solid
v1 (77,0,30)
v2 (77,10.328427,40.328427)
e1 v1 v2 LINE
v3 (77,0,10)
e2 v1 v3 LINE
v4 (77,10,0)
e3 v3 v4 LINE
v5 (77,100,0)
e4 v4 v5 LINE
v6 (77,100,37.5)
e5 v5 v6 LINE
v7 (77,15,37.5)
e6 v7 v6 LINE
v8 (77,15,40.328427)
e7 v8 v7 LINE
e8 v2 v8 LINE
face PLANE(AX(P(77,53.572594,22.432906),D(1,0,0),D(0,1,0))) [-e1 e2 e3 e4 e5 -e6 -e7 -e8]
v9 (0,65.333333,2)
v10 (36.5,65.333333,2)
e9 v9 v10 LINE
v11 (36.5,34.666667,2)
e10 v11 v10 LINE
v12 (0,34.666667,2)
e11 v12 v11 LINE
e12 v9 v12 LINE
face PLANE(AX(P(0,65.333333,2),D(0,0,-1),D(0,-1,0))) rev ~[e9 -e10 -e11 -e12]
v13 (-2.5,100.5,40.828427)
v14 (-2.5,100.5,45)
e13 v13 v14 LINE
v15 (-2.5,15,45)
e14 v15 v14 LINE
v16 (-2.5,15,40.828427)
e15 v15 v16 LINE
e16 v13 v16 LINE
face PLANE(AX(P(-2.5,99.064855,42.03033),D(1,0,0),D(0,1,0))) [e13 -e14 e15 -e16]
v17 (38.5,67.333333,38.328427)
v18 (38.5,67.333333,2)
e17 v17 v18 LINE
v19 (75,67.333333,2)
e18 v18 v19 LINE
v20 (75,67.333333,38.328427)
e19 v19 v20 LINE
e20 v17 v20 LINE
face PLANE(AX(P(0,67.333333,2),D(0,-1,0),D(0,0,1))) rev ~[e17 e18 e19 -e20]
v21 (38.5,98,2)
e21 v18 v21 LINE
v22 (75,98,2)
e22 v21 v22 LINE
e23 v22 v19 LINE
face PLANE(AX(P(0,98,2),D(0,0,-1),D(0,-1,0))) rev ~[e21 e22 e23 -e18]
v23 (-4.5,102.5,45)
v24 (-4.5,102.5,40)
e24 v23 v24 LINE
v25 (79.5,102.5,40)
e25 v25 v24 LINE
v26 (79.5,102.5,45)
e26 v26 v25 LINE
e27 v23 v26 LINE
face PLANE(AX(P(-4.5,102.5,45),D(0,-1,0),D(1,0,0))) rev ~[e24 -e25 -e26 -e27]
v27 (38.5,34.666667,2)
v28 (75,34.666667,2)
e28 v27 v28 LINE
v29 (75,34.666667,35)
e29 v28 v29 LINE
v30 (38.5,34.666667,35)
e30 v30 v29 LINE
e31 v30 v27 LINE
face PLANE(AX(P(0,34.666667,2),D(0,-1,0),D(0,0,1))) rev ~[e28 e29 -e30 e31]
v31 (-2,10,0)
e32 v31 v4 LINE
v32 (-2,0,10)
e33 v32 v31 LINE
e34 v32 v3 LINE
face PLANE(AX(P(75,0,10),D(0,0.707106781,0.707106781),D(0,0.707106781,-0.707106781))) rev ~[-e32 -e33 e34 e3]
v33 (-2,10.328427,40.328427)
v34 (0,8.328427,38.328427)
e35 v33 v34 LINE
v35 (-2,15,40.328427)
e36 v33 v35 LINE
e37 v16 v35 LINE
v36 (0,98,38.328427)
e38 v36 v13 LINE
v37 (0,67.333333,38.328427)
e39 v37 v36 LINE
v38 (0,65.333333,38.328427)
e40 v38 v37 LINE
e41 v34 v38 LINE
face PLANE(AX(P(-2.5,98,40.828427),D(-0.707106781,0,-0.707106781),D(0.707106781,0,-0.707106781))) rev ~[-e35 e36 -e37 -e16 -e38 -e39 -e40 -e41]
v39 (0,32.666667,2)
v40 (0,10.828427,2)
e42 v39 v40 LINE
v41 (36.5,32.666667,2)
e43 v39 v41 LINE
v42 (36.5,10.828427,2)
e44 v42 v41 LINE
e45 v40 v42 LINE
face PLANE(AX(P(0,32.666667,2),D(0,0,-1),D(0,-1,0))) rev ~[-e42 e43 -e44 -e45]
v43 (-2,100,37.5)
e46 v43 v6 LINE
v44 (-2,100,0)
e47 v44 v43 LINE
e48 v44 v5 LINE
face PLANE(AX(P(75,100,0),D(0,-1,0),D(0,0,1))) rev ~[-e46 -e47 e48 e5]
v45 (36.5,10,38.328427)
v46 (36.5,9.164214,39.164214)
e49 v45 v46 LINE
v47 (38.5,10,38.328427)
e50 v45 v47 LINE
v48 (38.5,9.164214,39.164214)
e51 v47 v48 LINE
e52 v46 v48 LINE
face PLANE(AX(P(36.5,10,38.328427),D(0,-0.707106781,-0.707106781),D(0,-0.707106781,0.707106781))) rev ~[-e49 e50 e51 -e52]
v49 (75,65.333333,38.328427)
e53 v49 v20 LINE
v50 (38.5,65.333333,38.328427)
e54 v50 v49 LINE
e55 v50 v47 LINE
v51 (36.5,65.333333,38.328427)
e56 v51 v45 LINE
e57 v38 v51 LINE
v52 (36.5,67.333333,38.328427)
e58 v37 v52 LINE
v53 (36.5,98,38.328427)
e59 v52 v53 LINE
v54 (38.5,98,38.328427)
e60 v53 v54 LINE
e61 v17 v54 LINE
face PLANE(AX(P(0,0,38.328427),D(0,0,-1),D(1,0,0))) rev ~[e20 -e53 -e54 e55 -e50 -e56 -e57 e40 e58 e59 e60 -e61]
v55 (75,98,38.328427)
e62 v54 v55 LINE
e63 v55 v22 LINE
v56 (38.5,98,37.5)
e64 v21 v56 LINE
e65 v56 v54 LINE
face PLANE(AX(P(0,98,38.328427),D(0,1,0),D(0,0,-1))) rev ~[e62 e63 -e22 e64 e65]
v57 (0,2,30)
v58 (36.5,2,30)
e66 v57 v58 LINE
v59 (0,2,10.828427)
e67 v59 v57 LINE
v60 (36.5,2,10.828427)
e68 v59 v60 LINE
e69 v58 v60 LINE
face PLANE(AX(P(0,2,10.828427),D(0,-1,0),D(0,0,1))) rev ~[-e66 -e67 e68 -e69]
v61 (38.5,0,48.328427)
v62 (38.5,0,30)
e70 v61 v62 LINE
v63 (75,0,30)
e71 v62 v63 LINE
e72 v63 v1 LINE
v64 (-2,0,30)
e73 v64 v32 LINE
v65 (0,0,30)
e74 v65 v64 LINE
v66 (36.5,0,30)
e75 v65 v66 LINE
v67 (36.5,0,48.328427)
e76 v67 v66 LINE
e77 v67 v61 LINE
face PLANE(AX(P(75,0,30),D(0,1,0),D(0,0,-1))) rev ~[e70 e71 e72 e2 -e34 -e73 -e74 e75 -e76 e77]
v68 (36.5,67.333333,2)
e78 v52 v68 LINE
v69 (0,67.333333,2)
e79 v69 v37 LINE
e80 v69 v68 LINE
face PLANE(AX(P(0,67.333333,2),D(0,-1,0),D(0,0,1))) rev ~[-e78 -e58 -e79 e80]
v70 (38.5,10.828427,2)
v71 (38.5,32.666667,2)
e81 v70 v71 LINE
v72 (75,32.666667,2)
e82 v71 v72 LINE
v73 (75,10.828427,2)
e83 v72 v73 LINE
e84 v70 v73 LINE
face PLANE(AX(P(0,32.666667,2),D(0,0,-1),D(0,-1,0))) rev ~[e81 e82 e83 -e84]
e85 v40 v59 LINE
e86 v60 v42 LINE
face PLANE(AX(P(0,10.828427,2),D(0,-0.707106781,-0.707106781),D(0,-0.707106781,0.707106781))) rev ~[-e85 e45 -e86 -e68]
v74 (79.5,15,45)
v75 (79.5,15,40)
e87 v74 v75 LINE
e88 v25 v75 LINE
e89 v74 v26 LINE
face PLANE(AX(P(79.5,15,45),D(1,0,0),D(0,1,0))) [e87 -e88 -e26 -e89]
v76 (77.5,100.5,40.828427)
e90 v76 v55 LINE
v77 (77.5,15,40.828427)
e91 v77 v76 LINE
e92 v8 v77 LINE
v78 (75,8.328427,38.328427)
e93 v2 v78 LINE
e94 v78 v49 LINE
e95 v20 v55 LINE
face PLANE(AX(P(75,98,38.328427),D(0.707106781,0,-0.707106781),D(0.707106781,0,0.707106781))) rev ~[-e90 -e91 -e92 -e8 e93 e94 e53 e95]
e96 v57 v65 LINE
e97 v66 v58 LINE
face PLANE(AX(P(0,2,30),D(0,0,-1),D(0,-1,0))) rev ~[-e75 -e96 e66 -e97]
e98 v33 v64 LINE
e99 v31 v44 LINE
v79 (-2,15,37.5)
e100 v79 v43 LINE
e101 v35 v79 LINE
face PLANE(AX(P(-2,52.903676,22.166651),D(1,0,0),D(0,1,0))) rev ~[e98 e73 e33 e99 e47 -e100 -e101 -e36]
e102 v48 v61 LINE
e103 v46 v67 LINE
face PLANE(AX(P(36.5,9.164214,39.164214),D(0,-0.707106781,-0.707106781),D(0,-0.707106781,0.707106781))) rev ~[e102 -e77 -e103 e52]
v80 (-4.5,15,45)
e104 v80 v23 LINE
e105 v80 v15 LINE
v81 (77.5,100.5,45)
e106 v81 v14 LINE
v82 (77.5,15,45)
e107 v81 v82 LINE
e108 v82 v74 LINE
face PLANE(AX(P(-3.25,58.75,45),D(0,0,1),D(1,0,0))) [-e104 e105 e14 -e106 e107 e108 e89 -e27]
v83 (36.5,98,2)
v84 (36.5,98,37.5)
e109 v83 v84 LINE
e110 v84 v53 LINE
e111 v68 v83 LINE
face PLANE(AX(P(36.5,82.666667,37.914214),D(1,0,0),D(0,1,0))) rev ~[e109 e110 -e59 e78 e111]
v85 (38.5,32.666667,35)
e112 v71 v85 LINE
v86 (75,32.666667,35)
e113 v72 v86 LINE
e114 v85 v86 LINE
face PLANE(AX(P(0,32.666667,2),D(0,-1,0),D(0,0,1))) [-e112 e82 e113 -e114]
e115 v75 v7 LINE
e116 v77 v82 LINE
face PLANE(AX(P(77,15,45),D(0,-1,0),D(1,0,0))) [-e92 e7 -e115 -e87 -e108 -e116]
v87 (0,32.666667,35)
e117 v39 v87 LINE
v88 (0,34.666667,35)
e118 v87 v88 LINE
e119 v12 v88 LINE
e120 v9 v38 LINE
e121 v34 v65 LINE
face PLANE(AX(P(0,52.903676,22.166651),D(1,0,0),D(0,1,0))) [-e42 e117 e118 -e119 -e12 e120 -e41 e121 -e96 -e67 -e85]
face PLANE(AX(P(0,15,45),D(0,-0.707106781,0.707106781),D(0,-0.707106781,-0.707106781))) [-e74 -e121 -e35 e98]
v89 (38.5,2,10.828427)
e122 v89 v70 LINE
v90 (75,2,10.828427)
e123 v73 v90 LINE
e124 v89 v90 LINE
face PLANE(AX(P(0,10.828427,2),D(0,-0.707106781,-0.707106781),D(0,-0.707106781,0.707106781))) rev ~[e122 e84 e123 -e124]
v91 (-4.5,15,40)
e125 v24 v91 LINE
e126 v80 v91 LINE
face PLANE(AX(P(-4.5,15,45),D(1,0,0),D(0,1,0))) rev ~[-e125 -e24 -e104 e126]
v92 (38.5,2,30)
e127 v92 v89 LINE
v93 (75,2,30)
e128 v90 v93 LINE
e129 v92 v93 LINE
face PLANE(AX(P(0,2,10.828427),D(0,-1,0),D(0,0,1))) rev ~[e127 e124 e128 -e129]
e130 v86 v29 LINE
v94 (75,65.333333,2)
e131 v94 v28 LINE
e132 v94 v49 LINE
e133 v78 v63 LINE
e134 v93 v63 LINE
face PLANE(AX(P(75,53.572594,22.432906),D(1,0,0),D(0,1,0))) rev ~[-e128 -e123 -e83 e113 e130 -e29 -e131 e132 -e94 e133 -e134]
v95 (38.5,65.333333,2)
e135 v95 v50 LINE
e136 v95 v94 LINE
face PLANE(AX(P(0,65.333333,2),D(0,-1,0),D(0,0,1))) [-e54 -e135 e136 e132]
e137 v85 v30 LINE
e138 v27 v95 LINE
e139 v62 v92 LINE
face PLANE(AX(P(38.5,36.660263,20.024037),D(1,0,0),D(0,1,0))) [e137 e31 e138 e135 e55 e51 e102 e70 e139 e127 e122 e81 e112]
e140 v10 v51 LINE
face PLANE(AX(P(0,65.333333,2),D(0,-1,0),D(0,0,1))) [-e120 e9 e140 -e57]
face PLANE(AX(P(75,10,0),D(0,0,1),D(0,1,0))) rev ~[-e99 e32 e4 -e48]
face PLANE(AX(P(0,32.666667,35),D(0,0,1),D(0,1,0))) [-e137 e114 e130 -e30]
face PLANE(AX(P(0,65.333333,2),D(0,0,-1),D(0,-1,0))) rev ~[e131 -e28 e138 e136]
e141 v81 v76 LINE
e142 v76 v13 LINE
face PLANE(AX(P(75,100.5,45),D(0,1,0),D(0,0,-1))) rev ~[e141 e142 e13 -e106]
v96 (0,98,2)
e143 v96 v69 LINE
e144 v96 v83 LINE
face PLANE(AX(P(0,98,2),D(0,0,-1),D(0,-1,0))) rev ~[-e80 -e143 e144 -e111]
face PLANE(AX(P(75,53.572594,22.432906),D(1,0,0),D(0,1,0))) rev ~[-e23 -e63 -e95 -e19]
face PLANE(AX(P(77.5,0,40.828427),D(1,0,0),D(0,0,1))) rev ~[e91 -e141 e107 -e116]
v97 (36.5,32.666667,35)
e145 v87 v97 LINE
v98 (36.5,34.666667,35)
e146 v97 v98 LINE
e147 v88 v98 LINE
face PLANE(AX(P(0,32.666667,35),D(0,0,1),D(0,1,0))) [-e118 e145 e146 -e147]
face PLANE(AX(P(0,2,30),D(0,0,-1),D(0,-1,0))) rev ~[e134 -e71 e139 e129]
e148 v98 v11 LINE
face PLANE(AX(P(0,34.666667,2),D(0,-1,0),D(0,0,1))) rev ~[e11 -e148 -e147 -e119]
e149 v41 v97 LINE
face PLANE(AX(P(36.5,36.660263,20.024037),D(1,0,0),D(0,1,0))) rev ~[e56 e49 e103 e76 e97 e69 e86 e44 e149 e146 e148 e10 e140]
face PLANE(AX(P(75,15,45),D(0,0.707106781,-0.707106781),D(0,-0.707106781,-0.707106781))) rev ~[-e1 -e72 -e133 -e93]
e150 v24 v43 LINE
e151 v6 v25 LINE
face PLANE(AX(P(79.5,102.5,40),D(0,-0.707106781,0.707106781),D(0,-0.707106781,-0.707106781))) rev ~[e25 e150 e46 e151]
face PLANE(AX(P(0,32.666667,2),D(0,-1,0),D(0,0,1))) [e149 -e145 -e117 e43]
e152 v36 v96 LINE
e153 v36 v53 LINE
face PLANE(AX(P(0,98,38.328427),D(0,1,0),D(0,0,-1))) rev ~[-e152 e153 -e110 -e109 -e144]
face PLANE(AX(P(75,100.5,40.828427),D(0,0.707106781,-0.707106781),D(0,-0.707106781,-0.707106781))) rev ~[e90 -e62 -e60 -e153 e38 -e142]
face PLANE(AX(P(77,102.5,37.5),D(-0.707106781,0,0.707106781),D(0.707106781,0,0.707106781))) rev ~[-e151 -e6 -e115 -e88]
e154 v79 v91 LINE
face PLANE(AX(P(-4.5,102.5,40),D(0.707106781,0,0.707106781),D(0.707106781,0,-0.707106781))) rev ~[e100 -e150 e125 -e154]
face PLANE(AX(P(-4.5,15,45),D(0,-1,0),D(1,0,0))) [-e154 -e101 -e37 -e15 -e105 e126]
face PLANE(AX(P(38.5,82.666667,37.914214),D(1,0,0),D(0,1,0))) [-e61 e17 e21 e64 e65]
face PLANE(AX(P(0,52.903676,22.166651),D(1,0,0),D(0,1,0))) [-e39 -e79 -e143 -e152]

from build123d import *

# Parameters (mm, degrees)
F1_DEPTH  = 2
F2_W      = 2
F2_H      = 33
F2_H_2    = 38
F3_DEPTH  = 75
F5_DEPTH  = 2
F6_W      = 2.5
F6_H      = 87.5
F7_DEPTH  = 7.5
F9_DEPTH  = 102.501
F11_DEPTH = 84.001
F13_DEPTH = 98
F15_DEPTH = 2.5
F17_DEPTH = 2.5
F19_DEPTH = 2.5
F21_DEPTH = 2.5
F23_W     = 30.666666667
F23_H     = 0.8284271247
F23_W_2   = 30.6666666667
F23_H_2   = 35.5
F24_DEPTH = 2


# Not quite as in the source:
# - a feature names something its author has since deleted; it is built from what else it names


with BuildPart() as f1:
    # F0 (on Right) → F1 (new body)
    with BuildSketch(Plane.YZ):
        Polygon((0, 10), (10, 0), (100, 0), (100, 37.5), (100, 45), (15, 45), (0, 30), align=None)
        Polygon((100, 45), (100, 37.5), (102.5, 40), (102.5, 45), align=None)
    extrude(amount=-F1_DEPTH)

    # F2 (on face) → F3 (join)
    with BuildSketch(Plane.YZ):
        Polygon((2, 30), (0, 30), (0, 10), (10, 0), (100, 0), (100, 37.5), (102.5, 40), (102.5, 45), (100.5, 45), (100.5, 40.8284271247), (98, 38.3284271247), (98, 2), (67.3333333333, 2), (65.3333333333, 2), (34.6666666667, 2), (32.6666666667, 2), (10.8284271247, 2), (2, 10.8284271247), align=None)
        with Locations((33.6666666667, 18.5)):
            Rectangle(F2_W, F2_H)
        with Locations((66.3333333333, 21)):
            Rectangle(F2_W, F2_H_2)
    extrude(amount=F3_DEPTH)

    # F4 (on face) → F5 (join)
    with BuildSketch(Plane.YZ.offset(75)):
        Polygon((100.5, 45), (15, 45), (0, 30), (0, 10), (10, 0), (100, 0), (100, 37.5), (102.5, 40), (102.5, 45), align=None)
    extrude(amount=F5_DEPTH)

    # F6 (on face) → F7 (join)
    with BuildSketch(Plane.XY.offset(45)):
        with Locations((-3.25, 58.75)):
            Rectangle(F6_W, F6_H)
        with Locations((78.25, 58.75)):
            Rectangle(F6_W, F6_H)
    extrude(amount=-F7_DEPTH)

    # F8 (on face) → F9 (cut, through all)
    with BuildSketch(Plane(origin=(0, 102.5, 0), x_dir=(-1, 0, 0), z_dir=(0, 1, 0))):
        Polygon((-79.5, 37.5), (-77, 37.5), (-79.5, 40), align=None)
        Polygon((4.5, 40), (2, 37.5), (4.5, 37.5), align=None)
    extrude(amount=-F9_DEPTH, mode=Mode.SUBTRACT)

    # F10 (on face) → F11 (cut, through all)
    with BuildSketch(Plane.YZ.offset(79.5)):
        Polygon((100, 37.5), (102.5, 37.5), (102.5, 40), align=None)
    extrude(amount=-F11_DEPTH, mode=Mode.SUBTRACT)

    # F12 (on face) → F13 (cut, through all)
    with BuildSketch(Plane.XZ):
        Polygon((77, 45), (75, 45), (0, 45), (-2, 45), (-2.5, 45), (-2.5, 40.8284271247), (0, 38.3284271247), (75, 38.3284271247), (75.3564065228, 38.6848336475), (77.5, 40.8284271247), (77.5, 45), align=None)
    extrude(amount=-F13_DEPTH, mode=Mode.SUBTRACT)

    # F14 (on face) → F15 (cut, through all)
    with BuildSketch(Plane(origin=(75, 0, 0), x_dir=(0, -1, 0), z_dir=(-1, 0, 0))):
        Polygon((-100.5, 40.8284271247), (-98, 38.3284271247), (-98, 45), (-100.5, 45), align=None)
    extrude(amount=-F15_DEPTH, mode=Mode.SUBTRACT)

    # F16 (on face) → F17 (join, through all)
    with BuildSketch(Plane(origin=(0, 98, 0), x_dir=(-1, 0, 0), z_dir=(0, 1, 0))):
        Polygon((-77.5, 38.3284271247), (-75, 38.3284271247), (-77.5, 40.8284271247), align=None)
    extrude(amount=F17_DEPTH)

    # F18 (on face) → F19 (cut, through all)
    with BuildSketch(Plane.YZ):
        Polygon((100.5, 40.8284271247), (100.5, 45), (98, 45), (98, 38.3284271247), align=None)
    extrude(amount=-F19_DEPTH, mode=Mode.SUBTRACT)

    # F20 (on face) → F21 (join, through all)
    with BuildSketch(Plane(origin=(0, 98, 0), x_dir=(-1, 0, 0), z_dir=(0, 1, 0))):
        Polygon((2.5, 38.3284271247), (2.5, 40.8284271247), (0, 38.3284271247), align=None)
    extrude(amount=F21_DEPTH)

    # F23 (on offset) → F24 (join)
    with BuildSketch(Plane.YZ.offset(36.5)):
        with Locations((82.6666666668, 37.9142135624)):
            Rectangle(F23_W, F23_H)
        with Locations((82.6666666667, 19.75)):
            Rectangle(F23_W_2, F23_H_2)
        Polygon((65.3333333333, 2), (65.3333333333, 37.5), (65.3333333333, 38.3284271247), (10, 38.3284271247), (10, 2.8284271247), (10.8284271247, 2), (32.6666666667, 2), (32.6666666667, 35), (34.6666666667, 35), (34.6666666667, 2), align=None)
        Polygon((10, 2.8284271247), (10, 38.3284271247), (2, 30), (2, 10.8284271247), align=None)
        Polygon((0, 30), (8.3284271248, 38.3284271248), (9.1642135624, 39.1642135624), (0, 48.3284271247), align=None)
        Polygon((2, 30), (10, 38.3284271247), (8.3284271251, 38.3284271247), (0, 30), align=None)
        Polygon((8.3284271251, 38.3284271247), (10, 38.3284271247), (9.1642135624, 39.1642135624), align=None)
    extrude(amount=F24_DEPTH)


solid = f1.part
